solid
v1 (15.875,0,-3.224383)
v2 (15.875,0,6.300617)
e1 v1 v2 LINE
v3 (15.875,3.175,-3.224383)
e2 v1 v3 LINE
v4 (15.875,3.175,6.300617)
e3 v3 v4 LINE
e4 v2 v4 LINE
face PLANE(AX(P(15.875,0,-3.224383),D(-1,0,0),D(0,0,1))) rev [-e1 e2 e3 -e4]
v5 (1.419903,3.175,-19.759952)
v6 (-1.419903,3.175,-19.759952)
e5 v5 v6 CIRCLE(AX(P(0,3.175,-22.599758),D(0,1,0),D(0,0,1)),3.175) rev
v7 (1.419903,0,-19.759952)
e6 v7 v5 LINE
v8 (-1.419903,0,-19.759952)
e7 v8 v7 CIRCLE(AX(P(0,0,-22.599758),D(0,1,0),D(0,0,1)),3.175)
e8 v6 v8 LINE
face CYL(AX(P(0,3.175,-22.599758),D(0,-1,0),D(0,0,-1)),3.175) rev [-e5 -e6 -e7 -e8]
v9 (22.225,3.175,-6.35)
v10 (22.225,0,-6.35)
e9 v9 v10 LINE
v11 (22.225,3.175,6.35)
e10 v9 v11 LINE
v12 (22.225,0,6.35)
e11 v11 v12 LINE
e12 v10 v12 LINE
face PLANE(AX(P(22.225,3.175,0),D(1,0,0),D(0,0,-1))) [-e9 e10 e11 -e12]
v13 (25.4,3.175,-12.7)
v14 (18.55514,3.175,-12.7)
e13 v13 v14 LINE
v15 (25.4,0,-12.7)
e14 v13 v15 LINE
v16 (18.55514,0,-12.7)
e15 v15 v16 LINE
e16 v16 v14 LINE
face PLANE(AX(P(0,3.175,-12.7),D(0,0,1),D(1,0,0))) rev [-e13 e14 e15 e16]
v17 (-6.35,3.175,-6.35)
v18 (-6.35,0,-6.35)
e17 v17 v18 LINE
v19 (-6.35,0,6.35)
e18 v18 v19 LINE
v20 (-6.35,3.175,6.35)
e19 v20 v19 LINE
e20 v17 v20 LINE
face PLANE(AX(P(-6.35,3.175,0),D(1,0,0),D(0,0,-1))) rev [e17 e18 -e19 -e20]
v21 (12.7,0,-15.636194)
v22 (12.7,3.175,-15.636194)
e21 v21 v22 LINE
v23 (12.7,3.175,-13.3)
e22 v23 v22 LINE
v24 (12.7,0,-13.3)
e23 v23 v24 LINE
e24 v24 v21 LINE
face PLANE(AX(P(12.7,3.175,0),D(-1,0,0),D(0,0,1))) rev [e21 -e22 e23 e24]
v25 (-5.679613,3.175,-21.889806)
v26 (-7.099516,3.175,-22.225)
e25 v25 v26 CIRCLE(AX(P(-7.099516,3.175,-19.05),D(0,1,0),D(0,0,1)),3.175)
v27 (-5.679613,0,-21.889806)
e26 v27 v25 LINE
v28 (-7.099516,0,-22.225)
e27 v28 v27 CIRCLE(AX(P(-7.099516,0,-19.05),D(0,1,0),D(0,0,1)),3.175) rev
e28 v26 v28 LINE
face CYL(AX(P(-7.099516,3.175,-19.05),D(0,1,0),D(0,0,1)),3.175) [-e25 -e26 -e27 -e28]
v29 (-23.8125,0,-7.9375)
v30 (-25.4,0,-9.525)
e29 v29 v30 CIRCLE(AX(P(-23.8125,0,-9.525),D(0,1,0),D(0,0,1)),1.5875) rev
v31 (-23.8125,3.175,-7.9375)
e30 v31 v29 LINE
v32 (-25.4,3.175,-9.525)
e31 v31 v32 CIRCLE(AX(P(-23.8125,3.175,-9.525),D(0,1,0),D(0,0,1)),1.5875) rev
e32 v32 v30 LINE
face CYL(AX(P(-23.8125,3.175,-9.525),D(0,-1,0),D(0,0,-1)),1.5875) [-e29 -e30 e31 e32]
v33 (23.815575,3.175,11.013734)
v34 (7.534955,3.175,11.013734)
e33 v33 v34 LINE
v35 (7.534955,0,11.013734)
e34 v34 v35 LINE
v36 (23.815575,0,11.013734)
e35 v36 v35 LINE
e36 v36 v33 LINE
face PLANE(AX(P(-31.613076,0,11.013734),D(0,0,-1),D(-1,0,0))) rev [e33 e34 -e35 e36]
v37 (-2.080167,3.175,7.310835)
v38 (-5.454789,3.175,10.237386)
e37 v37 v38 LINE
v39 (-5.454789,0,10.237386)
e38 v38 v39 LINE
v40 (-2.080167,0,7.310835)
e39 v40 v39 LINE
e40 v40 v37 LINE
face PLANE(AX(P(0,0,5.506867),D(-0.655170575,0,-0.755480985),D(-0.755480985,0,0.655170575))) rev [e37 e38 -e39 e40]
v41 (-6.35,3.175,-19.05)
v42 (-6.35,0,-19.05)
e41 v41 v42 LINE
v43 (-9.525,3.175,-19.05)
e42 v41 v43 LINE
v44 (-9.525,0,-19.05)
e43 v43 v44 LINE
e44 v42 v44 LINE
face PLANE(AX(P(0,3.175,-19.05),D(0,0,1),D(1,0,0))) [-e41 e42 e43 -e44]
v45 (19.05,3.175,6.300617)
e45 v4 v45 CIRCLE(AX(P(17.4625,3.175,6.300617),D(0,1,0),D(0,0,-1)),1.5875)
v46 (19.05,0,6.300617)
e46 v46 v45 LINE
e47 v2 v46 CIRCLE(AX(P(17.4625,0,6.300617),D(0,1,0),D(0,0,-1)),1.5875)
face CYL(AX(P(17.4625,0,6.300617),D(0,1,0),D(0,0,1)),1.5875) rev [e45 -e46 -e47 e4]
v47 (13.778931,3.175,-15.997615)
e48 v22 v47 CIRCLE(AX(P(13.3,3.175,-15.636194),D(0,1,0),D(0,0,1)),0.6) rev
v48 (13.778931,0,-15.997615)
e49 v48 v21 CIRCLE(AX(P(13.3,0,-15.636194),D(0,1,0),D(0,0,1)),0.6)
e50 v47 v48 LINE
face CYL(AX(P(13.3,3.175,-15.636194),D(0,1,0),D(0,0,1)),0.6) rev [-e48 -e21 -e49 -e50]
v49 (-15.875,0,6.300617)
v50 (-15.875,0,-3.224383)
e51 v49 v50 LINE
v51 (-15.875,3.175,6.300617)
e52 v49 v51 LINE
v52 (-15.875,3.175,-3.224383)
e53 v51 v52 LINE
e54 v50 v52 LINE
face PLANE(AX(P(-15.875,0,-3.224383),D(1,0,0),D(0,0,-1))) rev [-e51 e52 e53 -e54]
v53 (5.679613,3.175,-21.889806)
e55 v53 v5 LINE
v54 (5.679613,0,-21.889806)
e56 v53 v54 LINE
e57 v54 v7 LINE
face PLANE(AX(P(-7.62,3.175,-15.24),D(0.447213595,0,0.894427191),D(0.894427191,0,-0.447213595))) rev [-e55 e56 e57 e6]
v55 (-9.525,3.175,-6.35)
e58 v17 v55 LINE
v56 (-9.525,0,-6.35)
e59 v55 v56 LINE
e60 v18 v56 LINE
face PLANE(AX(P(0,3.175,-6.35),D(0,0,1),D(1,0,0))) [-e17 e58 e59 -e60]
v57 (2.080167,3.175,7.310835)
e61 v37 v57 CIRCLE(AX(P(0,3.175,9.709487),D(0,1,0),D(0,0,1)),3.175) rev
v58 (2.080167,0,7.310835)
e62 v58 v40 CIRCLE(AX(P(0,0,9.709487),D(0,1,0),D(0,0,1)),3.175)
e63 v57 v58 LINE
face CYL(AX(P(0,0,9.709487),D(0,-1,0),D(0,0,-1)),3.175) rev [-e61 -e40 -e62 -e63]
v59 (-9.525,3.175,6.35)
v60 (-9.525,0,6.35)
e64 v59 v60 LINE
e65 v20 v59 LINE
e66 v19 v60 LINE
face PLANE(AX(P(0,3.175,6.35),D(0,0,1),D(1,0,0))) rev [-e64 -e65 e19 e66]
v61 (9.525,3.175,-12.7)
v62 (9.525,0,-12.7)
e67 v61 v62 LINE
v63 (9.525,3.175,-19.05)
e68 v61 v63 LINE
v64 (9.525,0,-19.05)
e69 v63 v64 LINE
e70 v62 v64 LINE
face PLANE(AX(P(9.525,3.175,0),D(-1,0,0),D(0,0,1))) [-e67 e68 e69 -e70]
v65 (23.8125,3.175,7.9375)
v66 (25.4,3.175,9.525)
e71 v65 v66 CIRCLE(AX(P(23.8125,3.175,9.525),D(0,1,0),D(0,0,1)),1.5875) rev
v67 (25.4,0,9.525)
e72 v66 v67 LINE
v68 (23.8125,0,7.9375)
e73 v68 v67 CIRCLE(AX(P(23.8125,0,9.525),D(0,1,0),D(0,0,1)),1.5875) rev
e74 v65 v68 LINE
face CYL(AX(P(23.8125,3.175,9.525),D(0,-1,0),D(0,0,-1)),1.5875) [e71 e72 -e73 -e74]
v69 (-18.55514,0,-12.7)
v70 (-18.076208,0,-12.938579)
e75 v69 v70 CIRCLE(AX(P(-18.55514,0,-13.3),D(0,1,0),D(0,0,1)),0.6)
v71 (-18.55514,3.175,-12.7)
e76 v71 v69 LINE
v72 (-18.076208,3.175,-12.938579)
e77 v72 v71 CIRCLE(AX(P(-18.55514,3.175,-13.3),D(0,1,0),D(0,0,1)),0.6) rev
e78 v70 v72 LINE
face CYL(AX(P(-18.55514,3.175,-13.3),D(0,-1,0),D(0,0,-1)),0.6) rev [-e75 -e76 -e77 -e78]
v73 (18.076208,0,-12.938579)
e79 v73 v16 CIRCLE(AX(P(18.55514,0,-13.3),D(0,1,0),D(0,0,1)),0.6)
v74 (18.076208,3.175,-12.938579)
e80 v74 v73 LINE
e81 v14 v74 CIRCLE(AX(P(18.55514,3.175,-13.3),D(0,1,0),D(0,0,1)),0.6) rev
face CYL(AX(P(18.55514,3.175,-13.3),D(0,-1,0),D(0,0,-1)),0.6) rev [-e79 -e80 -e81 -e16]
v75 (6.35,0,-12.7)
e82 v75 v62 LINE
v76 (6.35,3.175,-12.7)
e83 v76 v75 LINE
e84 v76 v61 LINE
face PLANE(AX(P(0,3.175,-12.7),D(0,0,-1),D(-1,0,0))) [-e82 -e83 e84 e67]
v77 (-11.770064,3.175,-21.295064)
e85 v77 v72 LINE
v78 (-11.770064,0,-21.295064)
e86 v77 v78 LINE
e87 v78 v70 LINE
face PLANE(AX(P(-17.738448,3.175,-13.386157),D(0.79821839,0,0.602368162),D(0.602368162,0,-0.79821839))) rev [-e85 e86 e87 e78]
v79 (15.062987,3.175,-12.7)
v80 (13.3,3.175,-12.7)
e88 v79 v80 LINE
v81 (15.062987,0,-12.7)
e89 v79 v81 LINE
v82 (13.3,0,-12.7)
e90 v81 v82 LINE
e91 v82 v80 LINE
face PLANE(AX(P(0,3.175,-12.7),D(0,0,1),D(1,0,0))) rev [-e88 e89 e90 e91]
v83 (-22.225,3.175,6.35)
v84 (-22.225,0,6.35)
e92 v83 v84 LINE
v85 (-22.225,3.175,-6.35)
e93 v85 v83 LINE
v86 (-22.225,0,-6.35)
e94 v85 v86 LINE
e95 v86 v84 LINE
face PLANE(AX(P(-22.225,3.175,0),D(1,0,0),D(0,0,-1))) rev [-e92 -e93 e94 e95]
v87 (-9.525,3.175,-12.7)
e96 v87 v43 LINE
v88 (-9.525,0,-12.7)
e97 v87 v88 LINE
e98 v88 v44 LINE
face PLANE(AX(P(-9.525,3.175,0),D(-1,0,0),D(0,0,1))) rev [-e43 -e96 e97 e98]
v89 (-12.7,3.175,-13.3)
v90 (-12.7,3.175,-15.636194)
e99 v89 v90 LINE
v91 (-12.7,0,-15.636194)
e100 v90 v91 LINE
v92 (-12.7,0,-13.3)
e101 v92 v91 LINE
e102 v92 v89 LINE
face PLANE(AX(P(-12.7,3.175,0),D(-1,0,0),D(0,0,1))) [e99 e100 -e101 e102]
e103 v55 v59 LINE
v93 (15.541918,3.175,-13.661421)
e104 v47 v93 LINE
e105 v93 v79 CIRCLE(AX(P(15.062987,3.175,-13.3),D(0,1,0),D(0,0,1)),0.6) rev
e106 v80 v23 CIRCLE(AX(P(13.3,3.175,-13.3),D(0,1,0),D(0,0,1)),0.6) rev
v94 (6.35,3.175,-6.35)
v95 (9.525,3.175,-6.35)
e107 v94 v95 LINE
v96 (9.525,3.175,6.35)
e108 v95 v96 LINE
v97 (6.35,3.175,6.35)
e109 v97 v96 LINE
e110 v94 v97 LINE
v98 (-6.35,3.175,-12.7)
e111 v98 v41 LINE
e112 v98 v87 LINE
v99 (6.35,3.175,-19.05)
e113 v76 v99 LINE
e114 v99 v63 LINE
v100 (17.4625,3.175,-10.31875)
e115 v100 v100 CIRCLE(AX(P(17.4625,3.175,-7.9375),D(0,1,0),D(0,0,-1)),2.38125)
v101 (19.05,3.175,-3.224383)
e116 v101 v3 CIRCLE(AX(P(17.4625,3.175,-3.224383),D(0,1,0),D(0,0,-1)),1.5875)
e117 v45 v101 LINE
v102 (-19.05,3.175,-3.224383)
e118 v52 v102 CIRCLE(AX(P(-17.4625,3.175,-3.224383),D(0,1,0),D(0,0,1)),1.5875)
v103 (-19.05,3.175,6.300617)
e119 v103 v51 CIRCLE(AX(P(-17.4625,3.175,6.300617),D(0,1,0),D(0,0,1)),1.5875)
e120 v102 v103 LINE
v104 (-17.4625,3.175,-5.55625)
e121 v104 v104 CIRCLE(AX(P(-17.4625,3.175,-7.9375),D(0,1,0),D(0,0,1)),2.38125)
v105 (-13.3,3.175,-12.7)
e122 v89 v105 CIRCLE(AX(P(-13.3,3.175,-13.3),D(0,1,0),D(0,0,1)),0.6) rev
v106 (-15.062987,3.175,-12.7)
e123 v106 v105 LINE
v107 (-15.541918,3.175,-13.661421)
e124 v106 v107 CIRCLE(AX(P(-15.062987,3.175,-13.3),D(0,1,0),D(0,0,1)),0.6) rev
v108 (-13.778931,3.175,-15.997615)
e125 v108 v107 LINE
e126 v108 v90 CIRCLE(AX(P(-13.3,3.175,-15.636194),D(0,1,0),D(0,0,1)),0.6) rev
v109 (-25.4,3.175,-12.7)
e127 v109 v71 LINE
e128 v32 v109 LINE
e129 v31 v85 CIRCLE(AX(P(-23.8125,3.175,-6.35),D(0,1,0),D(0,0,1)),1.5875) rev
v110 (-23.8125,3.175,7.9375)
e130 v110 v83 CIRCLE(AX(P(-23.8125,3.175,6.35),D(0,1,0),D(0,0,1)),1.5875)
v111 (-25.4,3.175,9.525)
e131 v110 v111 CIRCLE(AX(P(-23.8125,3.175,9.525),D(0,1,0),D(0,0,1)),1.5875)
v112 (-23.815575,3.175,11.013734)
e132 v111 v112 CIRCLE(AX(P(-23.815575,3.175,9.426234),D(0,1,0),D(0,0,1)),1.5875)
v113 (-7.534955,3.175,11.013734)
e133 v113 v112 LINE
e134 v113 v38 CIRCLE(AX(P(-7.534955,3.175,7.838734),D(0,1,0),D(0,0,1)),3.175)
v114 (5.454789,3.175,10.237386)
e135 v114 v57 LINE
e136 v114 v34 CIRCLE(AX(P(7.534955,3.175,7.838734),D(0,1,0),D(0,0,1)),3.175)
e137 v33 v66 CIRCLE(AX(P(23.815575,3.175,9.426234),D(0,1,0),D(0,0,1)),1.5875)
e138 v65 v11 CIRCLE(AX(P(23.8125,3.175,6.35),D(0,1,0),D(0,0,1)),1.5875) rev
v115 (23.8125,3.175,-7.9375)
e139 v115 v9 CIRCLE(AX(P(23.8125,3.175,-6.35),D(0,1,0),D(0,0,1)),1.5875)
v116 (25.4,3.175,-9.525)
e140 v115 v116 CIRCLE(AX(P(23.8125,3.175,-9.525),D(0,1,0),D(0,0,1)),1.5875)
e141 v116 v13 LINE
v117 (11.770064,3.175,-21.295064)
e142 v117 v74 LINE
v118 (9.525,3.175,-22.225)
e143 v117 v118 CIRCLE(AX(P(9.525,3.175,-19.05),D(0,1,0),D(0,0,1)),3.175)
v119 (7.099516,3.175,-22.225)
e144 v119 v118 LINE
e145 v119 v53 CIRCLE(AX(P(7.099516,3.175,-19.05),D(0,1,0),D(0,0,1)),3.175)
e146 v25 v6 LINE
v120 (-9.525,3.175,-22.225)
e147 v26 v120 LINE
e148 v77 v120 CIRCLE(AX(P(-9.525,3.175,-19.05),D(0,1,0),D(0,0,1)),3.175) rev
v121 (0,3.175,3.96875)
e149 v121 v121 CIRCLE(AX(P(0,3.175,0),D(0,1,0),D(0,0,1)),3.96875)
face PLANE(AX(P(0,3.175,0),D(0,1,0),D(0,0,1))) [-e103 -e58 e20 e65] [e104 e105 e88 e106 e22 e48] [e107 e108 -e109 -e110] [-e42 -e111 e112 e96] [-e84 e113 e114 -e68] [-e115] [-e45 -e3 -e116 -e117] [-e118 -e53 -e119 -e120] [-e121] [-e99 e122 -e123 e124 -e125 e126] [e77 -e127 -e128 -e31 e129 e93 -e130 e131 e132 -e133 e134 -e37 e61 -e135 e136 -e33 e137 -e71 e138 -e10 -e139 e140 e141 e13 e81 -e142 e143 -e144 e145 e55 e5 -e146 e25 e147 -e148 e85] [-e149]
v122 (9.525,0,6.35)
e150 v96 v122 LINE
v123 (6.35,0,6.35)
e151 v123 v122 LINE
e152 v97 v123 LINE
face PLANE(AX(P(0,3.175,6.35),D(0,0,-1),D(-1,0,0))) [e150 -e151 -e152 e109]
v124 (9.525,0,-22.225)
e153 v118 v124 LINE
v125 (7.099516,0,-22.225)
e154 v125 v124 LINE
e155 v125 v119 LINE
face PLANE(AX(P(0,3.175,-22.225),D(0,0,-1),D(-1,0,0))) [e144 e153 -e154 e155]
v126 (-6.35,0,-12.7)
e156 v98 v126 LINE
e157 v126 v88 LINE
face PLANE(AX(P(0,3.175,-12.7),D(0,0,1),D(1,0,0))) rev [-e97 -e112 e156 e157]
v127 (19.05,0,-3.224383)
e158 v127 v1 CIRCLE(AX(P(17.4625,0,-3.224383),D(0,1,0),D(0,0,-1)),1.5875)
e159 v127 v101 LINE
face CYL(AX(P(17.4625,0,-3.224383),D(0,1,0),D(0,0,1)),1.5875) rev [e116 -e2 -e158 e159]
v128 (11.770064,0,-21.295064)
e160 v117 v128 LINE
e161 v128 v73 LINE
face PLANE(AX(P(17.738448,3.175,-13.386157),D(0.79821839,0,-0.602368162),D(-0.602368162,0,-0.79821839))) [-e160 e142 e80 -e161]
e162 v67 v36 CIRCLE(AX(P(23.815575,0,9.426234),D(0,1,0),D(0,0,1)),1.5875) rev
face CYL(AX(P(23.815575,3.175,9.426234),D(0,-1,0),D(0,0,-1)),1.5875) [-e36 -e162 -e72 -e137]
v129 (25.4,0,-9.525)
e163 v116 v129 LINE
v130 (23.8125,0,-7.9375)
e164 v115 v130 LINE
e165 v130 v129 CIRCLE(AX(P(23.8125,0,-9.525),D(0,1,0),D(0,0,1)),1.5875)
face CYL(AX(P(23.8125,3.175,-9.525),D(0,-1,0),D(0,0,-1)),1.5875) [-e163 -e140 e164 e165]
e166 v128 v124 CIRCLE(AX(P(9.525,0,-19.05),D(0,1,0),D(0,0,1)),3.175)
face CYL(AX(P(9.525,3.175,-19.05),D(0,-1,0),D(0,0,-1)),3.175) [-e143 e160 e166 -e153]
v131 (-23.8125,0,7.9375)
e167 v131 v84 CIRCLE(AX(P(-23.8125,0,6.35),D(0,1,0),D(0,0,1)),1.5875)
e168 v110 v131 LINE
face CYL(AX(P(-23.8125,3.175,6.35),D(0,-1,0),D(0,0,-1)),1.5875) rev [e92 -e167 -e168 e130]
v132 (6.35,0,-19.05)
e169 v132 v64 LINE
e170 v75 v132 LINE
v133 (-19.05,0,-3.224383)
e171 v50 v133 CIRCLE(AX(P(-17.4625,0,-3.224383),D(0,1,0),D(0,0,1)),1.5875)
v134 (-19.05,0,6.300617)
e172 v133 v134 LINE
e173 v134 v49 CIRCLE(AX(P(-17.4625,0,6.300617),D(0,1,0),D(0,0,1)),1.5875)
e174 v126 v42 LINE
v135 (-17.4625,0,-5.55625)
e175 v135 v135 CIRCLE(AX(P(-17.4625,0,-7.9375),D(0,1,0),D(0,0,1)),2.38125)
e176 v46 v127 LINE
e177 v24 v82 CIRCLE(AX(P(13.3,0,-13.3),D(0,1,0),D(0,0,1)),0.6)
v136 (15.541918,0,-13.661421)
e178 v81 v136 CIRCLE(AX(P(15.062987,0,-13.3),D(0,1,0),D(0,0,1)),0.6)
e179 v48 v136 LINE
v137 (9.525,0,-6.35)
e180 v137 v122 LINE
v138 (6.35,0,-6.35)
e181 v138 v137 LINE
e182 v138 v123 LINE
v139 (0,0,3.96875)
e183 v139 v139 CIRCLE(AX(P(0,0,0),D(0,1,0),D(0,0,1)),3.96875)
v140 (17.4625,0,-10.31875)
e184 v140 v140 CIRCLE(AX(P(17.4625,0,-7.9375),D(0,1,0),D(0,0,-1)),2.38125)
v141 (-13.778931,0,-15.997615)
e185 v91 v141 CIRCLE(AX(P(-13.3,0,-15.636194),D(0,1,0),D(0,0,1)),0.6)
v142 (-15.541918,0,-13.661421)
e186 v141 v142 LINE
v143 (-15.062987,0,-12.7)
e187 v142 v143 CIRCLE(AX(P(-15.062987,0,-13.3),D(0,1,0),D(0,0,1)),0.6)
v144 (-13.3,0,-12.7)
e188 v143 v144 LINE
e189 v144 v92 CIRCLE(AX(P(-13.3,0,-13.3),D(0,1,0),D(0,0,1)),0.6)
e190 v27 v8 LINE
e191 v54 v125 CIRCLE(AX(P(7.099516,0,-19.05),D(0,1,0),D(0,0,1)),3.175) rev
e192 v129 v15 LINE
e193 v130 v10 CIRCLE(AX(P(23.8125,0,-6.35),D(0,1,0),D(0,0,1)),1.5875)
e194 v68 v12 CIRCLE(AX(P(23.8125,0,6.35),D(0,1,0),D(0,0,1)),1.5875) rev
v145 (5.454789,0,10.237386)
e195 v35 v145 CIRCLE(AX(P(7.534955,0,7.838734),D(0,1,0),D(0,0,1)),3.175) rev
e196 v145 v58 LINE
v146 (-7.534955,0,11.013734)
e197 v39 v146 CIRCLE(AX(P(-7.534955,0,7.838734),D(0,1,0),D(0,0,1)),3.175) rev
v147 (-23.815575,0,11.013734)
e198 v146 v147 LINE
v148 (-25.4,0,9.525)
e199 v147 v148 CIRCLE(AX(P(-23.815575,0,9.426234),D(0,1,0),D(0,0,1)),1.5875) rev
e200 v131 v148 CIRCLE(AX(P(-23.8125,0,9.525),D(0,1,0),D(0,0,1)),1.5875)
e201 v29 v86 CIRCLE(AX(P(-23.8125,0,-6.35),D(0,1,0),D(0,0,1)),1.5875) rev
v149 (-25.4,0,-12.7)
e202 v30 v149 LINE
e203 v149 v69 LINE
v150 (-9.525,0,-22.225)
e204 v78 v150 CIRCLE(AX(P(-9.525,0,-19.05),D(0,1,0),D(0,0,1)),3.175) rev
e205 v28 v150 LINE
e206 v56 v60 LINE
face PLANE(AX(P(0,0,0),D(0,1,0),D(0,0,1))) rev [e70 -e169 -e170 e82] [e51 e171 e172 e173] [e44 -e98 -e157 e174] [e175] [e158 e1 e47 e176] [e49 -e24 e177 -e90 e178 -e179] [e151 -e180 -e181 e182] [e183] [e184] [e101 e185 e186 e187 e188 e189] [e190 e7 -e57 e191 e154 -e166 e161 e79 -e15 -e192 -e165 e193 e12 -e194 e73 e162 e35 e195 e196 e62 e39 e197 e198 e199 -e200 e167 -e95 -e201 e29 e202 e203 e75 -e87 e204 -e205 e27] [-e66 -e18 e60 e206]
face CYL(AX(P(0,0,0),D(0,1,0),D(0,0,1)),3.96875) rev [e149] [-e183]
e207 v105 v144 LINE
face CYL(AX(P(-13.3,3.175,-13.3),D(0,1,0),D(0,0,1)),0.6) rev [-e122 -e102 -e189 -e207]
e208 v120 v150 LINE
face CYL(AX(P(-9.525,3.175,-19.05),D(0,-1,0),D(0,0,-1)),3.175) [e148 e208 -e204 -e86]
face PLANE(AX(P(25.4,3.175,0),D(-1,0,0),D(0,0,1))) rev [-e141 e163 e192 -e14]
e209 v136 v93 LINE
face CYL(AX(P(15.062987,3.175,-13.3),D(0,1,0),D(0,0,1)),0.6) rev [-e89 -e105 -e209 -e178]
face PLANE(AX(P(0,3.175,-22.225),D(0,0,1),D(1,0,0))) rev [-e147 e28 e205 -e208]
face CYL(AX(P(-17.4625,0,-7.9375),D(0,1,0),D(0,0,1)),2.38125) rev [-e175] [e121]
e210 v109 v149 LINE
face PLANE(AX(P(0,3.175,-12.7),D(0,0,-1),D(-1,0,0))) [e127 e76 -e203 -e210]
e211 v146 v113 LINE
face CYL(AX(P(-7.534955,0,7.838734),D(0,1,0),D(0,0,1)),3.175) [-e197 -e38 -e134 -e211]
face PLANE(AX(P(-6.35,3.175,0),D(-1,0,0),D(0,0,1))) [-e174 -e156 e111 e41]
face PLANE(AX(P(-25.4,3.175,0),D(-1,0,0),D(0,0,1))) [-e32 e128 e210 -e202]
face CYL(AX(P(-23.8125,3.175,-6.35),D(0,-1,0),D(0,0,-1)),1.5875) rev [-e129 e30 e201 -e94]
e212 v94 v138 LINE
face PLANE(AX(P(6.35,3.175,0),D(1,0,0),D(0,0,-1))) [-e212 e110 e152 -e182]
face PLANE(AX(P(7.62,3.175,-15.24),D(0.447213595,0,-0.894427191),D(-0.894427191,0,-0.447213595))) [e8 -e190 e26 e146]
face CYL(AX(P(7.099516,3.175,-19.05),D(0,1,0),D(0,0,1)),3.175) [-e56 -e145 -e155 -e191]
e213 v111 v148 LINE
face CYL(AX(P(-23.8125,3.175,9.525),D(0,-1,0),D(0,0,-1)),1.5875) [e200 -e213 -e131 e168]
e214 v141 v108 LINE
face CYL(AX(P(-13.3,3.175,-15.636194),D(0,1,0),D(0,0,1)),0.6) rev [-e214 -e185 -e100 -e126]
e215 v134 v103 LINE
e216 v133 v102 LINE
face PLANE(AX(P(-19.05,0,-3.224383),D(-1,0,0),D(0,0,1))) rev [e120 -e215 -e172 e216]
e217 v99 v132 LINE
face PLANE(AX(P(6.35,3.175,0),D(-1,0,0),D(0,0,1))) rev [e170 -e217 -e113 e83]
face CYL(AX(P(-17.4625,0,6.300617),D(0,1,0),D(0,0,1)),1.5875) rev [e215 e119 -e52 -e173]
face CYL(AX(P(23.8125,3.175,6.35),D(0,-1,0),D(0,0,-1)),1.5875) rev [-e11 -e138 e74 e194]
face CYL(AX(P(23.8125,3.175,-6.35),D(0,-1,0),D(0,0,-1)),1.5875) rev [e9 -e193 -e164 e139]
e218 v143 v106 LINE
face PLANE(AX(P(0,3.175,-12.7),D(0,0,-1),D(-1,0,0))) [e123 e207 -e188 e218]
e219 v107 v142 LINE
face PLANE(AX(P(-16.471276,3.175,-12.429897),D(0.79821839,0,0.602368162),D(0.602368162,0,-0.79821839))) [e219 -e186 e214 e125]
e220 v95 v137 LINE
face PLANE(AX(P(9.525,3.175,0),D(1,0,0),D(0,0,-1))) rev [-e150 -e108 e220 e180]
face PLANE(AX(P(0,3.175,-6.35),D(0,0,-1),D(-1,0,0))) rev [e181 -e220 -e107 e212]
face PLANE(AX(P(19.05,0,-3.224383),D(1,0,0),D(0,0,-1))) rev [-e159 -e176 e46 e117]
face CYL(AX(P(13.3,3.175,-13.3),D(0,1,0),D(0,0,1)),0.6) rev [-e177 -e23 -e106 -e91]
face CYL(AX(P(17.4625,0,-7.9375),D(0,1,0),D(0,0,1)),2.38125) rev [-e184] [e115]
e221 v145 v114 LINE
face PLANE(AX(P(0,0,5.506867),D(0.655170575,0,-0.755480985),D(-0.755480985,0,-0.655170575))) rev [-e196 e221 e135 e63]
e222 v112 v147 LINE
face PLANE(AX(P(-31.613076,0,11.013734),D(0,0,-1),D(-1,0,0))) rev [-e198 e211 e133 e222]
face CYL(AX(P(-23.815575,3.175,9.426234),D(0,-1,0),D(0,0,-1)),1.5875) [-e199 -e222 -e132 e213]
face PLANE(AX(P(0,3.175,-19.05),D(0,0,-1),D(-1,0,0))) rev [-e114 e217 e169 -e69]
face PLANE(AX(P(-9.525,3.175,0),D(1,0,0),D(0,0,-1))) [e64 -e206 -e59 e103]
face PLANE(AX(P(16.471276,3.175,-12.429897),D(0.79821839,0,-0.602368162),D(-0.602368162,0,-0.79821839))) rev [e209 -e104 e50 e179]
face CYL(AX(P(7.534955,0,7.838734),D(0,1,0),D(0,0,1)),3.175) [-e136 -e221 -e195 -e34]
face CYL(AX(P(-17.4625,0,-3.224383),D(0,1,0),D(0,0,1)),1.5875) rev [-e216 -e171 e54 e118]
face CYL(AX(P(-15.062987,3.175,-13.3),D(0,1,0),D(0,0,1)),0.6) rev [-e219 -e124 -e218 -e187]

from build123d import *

# Parameters (mm, degrees)
SKETCH1_R           = 3.175
SKETCH1_W           = 3.175
SKETCH1_H           = 12.7
SKETCH1_H_2         = 6.35
BOSS_EXTRUDE1_DEPTH = 3.175
FILLET1_R           = 1.5875
SKETCH2_R           = 2.38125
CUT_EXTRUDE1_DEPTH  = 46.900442536
FILLET2_R           = 3.175
FILLET4_R           = 0.6
SKETCH3_W           = 59.294957885
SKETCH3_H           = 30.48
CUT_EXTRUDE5_DEPTH  = 46.900442536
FILLET5_R           = 1.5875
CUT_EXTRUDE6_DEPTH  = 34.89972345
SKETCH5_R           = 3.96875
CUT_EXTRUDE7_DEPTH  = 34.89972345
FILLET6_R           = 3.175


with BuildPart() as part:
    # Sketch1 → Boss-Extrude1 (new body)
    with BuildSketch(Plane(origin=(0, 0, 0), x_dir=(1, 0, 0), z_dir=(0, 1, 0))):
        with BuildLine():
            Line((25.4, -12.7), (25.4, -9.525))
            ThreePointArc((25.4, -9.525), (24.935032015, -8.402467985), (23.8125, -7.9375))
            ThreePointArc((23.8125, -7.9375), (22.689967985, -7.472532015), (22.225, -6.35))
            Line((22.225, -6.35), (22.225, 6.35))
            ThreePointArc((22.225, 6.35), (22.689967985, 7.472532015), (23.8125, 7.9375))
            ThreePointArc((23.8125, 7.9375), (24.935032015, 8.402467985), (25.4, 9.525))
            Line((25.4, 9.525), (25.4, 12.7))
            Line((25.4, 12.7), (23.8125, 12.7))
            Line((23.8125, 12.7), (18.25625, 12.7))
            Line((18.25625, 12.7), (11.77006403, 21.29506403))
            ThreePointArc((11.77006403, 21.29506403), (10.740019898, 21.983317516), (9.525, 22.225))
            Line((9.525, 22.225), (6.35, 22.225))
            Line((6.35, 22.225), (0, 19.05))
            Line((0, 19.05), (-6.35, 22.225))
            Line((-6.35, 22.225), (-9.525, 22.225))
            ThreePointArc((-9.525, 22.225), (-10.740019898, 21.983317516), (-11.77006403, 21.29506403))
            Line((-11.77006403, 21.29506403), (-18.25625, 12.7))
            Line((-18.25625, 12.7), (-23.8125, 12.7))
            Line((-23.8125, 12.7), (-25.4, 12.7))
            Line((-25.4, 12.7), (-25.4, 9.525))
            ThreePointArc((-25.4, 9.525), (-24.935032015, 8.402467985), (-23.8125, 7.9375))
            ThreePointArc((-23.8125, 7.9375), (-22.689967985, 7.472532015), (-22.225, 6.35))
            Line((-22.225, 6.35), (-22.225, -6.35))
            ThreePointArc((-22.225, -6.35), (-22.689967985, -7.472532015), (-23.8125, -7.9375))
            ThreePointArc((-23.8125, -7.9375), (-24.935032015, -8.402467985), (-25.4, -9.525))
            Line((-25.4, -9.525), (-25.4, -12.7))
            Line((-25.4, -12.7), (-25.4, -31.75))
            ThreePointArc((-25.4, -31.75), (-20.422679281, -37.949858998), (-13.293464066, -34.430446612))
            Line((-13.293464066, -34.430446612), (-3.175, -12.7))
            Line((-3.175, -12.7), (3.175, -12.7))
            Line((3.175, -12.7), (13.293464066, -34.430446612))
            ThreePointArc((13.293464066, -34.430446612), (20.422679281, -37.949858998), (25.4, -31.75))
            Line((25.4, -31.75), (25.4, -12.7))
        make_face()
        with Locations(Location((-19.05, -31.75, 0), (0, 0, 270))):
            Circle(SKETCH1_R, mode=Mode.SUBTRACT)
        with Locations(Location((19.05, -31.75, 0), (0, 0, 270))):
            Circle(SKETCH1_R, mode=Mode.SUBTRACT)
        with Locations((-7.9375, 0)):
            Rectangle(SKETCH1_W, SKETCH1_H, mode=Mode.SUBTRACT)
        with BuildLine():
            Line((-19.05, -12.7), (-19.05, -22.225))
            ThreePointArc((-19.05, -22.225), (-16.990981078, -22.450211503), (-15.029330082, -23.115196099))
            Line((-15.029330082, -23.115196099), (-10.179646624, -12.7))
            Line((-10.179646624, -12.7), (-19.05, -12.7))
        make_face(mode=Mode.SUBTRACT)
        with BuildLine():
            Line((10.179646624, -12.7), (19.05, -12.7))
            Line((19.05, -12.7), (19.05, -22.225))
            ThreePointArc((19.05, -22.225), (16.990981078, -22.450211503), (15.029330082, -23.115196099))
            Line((15.029330082, -23.115196099), (10.179646624, -12.7))
        make_face(mode=Mode.SUBTRACT)
        with Locations((7.9375, 0)):
            Rectangle(SKETCH1_W, SKETCH1_H, mode=Mode.SUBTRACT)
        with Locations((-7.9375, 15.875)):
            Rectangle(SKETCH1_W, SKETCH1_H_2, mode=Mode.SUBTRACT)
        Polygon((16.267445908, 12.7), (12.7, 12.7), (12.7, 17.427343025), align=None, mode=Mode.SUBTRACT)
        with Locations((7.9375, 15.875)):
            Rectangle(SKETCH1_W, SKETCH1_H_2, mode=Mode.SUBTRACT)
        Polygon((-12.7, 12.7), (-12.7, 17.427343025), (-16.267445908, 12.7), align=None, mode=Mode.SUBTRACT)
    extrude(amount=BOSS_EXTRUDE1_DEPTH)

    # Fillet1
    fillet1_edges = [part.edges().sort_by_distance(p)[0] for p in [
        (3.175, 1.5875, 12.7),
        (-3.175, 1.5875, 12.7),
        (-10.179646624, 1.5875, 12.7),
        (-19.05, 1.5875, 12.7),
        (19.05, 1.5875, 12.7),
        (10.179646624, 1.5875, 12.7),
    ]]
    fillet(fillet1_edges, radius=FILLET1_R)

    # Sketch2 → Cut-Extrude1 (cut, through all)
    with BuildSketch(Plane(origin=(0, 3.175, 0), x_dir=(1, 0, 0), z_dir=(0, 1, 0))):
        with Locations(Location((-17.4625, 7.9375, 0), (0, 0, 270))):
            Circle(SKETCH2_R)
        with Locations(Location((17.4625, 7.9375, 0), (0, 0, 90))):
            Circle(SKETCH2_R)
    extrude(amount=-CUT_EXTRUDE1_DEPTH, mode=Mode.SUBTRACT)

    # Fillet2
    fillet2_edges = [part.edges().sort_by_distance(p)[0] for p in [
        (-6.35, 1.5875, -22.225),
        (0, 1.5875, -19.05),
        (6.35, 1.5875, -22.225),
    ]]
    fillet(fillet2_edges, radius=FILLET2_R)

    # Fillet4
    fillet4_edges = [part.edges().sort_by_distance(p)[0] for p in [
        (18.25625, 1.5875, -12.7),
        (-18.25625, 1.5875, -12.7),
        (16.267445908, 1.5875, -12.7),
        (12.7, 1.5875, -17.427343025),
        (12.7, 1.5875, -12.7),
        (-12.7, 1.5875, -12.7),
        (-12.7, 1.5875, -17.427343025),
        (-16.267445908, 1.5875, -12.7),
    ]]
    fillet(fillet4_edges, radius=FILLET4_R)

    # Sketch3 → Cut-Extrude5 (cut, through all)
    with BuildSketch(Plane(origin=(0, 3.175, 0), x_dir=(1, 0, 0), z_dir=(0, 1, 0))):
        with Locations((-1.965596619, -26.253733592)):
            Rectangle(SKETCH3_W, SKETCH3_H)
    extrude(amount=-CUT_EXTRUDE5_DEPTH, mode=Mode.SUBTRACT)

    # Fillet5
    # the kernel refuses this fillet: 1.5875 mm, written as the material it takes off along each edge
    with BuildSketch(Plane(origin=(25.4, -3.961061605, 11.013733592), x_dir=(0, 0, -1), z_dir=(0, 1, 0))) as fillet5_piece_1:
        with BuildLine():
            CenterArc((1.5875, 1.584424642), FILLET5_R, 180, 86.433035976)
            Line((0, 1.584424642), (-0.03175, 1.584424642))
            Line((-0.03175, 1.584424642), (-0.03175, 0))
            Line((-0.03175, 0), (0, -0.03175))
            ThreePointArc((0, -0.03175), (0.744366796, -0.03175), (1.486758264, -0.031688493))
            Line((1.486758264, -0.031688493), (1.488733592, 0))
        make_face()
    extrude(amount=11.097123211, mode=Mode.SUBTRACT)
    with BuildSketch(Plane(origin=(-25.4, 7.136061605, 11.013733592), x_dir=(1, 0, 0), z_dir=(0, -1, 0))) as fillet5_piece_2:
        with BuildLine():
            CenterArc((1.584424642, -1.5875), FILLET5_R, 90, 86.433035976)
            Line((0, -1.488733592), (-0.031688493, -1.486758264))
            ThreePointArc((-0.031688493, -1.486758264), (-0.03175, -0.744366796), (-0.03175, 0))
            Line((-0.03175, 0), (0, 0.03175))
            Line((0, 0.03175), (1.584424642, 0.03175))
            Line((1.584424642, 0.03175), (1.584424642, 0))
        make_face()
    extrude(amount=11.097123211, mode=Mode.SUBTRACT)

    # Sketch4 → Cut-Extrude6 (cut, through all)
    with BuildSketch(Plane(origin=(0, 3.175, 0), x_dir=(1, 0, 0), z_dir=(0, 1, 0))):
        with BuildLine():
            Line((-15.875, 3.224383204), (-15.875, -6.300616796))
            ThreePointArc((-15.875, -6.300616796), (-17.4625, -7.888116796), (-19.05, -6.300616796))
            Line((-19.05, -6.300616796), (-19.05, 3.224383204))
            ThreePointArc((-19.05, 3.224383204), (-17.4625, 4.811883204), (-15.875, 3.224383204))
        make_face()
        with BuildLine():
            Line((15.875, 3.224383204), (15.875, -6.300616796))
            ThreePointArc((15.875, -6.300616796), (17.4625, -7.888116796), (19.05, -6.300616796))
            Line((19.05, -6.300616796), (19.05, 3.224383204))
            ThreePointArc((19.05, 3.224383204), (17.4625, 4.811883204), (15.875, 3.224383204))
        make_face()
    extrude(amount=-CUT_EXTRUDE6_DEPTH, mode=Mode.SUBTRACT)

    # Sketch5 → Cut-Extrude7 (cut, through all)
    with BuildSketch(Plane(origin=(0, 3.175, 0), x_dir=(1, 0, 0), z_dir=(0, 1, 0))):
        with Locations(Location((0, 0, 0), (0, 0, 270))):
            Circle(SKETCH5_R)
        Polygon((0, -5.506866796), (-6.35, -11.013733592), (6.35, -11.013733592), align=None)
    extrude(amount=-CUT_EXTRUDE7_DEPTH, mode=Mode.SUBTRACT)

    # Fillet6
    fillet6_edges = [part.edges().sort_by_distance(p)[0] for p in [
        (0, 1.5875, 5.506866796),
        (6.35, 1.5875, 11.013733592),
        (-6.35, 1.5875, 11.013733592),
    ]]
    fillet(fillet6_edges, radius=FILLET6_R)


solid = part.part
